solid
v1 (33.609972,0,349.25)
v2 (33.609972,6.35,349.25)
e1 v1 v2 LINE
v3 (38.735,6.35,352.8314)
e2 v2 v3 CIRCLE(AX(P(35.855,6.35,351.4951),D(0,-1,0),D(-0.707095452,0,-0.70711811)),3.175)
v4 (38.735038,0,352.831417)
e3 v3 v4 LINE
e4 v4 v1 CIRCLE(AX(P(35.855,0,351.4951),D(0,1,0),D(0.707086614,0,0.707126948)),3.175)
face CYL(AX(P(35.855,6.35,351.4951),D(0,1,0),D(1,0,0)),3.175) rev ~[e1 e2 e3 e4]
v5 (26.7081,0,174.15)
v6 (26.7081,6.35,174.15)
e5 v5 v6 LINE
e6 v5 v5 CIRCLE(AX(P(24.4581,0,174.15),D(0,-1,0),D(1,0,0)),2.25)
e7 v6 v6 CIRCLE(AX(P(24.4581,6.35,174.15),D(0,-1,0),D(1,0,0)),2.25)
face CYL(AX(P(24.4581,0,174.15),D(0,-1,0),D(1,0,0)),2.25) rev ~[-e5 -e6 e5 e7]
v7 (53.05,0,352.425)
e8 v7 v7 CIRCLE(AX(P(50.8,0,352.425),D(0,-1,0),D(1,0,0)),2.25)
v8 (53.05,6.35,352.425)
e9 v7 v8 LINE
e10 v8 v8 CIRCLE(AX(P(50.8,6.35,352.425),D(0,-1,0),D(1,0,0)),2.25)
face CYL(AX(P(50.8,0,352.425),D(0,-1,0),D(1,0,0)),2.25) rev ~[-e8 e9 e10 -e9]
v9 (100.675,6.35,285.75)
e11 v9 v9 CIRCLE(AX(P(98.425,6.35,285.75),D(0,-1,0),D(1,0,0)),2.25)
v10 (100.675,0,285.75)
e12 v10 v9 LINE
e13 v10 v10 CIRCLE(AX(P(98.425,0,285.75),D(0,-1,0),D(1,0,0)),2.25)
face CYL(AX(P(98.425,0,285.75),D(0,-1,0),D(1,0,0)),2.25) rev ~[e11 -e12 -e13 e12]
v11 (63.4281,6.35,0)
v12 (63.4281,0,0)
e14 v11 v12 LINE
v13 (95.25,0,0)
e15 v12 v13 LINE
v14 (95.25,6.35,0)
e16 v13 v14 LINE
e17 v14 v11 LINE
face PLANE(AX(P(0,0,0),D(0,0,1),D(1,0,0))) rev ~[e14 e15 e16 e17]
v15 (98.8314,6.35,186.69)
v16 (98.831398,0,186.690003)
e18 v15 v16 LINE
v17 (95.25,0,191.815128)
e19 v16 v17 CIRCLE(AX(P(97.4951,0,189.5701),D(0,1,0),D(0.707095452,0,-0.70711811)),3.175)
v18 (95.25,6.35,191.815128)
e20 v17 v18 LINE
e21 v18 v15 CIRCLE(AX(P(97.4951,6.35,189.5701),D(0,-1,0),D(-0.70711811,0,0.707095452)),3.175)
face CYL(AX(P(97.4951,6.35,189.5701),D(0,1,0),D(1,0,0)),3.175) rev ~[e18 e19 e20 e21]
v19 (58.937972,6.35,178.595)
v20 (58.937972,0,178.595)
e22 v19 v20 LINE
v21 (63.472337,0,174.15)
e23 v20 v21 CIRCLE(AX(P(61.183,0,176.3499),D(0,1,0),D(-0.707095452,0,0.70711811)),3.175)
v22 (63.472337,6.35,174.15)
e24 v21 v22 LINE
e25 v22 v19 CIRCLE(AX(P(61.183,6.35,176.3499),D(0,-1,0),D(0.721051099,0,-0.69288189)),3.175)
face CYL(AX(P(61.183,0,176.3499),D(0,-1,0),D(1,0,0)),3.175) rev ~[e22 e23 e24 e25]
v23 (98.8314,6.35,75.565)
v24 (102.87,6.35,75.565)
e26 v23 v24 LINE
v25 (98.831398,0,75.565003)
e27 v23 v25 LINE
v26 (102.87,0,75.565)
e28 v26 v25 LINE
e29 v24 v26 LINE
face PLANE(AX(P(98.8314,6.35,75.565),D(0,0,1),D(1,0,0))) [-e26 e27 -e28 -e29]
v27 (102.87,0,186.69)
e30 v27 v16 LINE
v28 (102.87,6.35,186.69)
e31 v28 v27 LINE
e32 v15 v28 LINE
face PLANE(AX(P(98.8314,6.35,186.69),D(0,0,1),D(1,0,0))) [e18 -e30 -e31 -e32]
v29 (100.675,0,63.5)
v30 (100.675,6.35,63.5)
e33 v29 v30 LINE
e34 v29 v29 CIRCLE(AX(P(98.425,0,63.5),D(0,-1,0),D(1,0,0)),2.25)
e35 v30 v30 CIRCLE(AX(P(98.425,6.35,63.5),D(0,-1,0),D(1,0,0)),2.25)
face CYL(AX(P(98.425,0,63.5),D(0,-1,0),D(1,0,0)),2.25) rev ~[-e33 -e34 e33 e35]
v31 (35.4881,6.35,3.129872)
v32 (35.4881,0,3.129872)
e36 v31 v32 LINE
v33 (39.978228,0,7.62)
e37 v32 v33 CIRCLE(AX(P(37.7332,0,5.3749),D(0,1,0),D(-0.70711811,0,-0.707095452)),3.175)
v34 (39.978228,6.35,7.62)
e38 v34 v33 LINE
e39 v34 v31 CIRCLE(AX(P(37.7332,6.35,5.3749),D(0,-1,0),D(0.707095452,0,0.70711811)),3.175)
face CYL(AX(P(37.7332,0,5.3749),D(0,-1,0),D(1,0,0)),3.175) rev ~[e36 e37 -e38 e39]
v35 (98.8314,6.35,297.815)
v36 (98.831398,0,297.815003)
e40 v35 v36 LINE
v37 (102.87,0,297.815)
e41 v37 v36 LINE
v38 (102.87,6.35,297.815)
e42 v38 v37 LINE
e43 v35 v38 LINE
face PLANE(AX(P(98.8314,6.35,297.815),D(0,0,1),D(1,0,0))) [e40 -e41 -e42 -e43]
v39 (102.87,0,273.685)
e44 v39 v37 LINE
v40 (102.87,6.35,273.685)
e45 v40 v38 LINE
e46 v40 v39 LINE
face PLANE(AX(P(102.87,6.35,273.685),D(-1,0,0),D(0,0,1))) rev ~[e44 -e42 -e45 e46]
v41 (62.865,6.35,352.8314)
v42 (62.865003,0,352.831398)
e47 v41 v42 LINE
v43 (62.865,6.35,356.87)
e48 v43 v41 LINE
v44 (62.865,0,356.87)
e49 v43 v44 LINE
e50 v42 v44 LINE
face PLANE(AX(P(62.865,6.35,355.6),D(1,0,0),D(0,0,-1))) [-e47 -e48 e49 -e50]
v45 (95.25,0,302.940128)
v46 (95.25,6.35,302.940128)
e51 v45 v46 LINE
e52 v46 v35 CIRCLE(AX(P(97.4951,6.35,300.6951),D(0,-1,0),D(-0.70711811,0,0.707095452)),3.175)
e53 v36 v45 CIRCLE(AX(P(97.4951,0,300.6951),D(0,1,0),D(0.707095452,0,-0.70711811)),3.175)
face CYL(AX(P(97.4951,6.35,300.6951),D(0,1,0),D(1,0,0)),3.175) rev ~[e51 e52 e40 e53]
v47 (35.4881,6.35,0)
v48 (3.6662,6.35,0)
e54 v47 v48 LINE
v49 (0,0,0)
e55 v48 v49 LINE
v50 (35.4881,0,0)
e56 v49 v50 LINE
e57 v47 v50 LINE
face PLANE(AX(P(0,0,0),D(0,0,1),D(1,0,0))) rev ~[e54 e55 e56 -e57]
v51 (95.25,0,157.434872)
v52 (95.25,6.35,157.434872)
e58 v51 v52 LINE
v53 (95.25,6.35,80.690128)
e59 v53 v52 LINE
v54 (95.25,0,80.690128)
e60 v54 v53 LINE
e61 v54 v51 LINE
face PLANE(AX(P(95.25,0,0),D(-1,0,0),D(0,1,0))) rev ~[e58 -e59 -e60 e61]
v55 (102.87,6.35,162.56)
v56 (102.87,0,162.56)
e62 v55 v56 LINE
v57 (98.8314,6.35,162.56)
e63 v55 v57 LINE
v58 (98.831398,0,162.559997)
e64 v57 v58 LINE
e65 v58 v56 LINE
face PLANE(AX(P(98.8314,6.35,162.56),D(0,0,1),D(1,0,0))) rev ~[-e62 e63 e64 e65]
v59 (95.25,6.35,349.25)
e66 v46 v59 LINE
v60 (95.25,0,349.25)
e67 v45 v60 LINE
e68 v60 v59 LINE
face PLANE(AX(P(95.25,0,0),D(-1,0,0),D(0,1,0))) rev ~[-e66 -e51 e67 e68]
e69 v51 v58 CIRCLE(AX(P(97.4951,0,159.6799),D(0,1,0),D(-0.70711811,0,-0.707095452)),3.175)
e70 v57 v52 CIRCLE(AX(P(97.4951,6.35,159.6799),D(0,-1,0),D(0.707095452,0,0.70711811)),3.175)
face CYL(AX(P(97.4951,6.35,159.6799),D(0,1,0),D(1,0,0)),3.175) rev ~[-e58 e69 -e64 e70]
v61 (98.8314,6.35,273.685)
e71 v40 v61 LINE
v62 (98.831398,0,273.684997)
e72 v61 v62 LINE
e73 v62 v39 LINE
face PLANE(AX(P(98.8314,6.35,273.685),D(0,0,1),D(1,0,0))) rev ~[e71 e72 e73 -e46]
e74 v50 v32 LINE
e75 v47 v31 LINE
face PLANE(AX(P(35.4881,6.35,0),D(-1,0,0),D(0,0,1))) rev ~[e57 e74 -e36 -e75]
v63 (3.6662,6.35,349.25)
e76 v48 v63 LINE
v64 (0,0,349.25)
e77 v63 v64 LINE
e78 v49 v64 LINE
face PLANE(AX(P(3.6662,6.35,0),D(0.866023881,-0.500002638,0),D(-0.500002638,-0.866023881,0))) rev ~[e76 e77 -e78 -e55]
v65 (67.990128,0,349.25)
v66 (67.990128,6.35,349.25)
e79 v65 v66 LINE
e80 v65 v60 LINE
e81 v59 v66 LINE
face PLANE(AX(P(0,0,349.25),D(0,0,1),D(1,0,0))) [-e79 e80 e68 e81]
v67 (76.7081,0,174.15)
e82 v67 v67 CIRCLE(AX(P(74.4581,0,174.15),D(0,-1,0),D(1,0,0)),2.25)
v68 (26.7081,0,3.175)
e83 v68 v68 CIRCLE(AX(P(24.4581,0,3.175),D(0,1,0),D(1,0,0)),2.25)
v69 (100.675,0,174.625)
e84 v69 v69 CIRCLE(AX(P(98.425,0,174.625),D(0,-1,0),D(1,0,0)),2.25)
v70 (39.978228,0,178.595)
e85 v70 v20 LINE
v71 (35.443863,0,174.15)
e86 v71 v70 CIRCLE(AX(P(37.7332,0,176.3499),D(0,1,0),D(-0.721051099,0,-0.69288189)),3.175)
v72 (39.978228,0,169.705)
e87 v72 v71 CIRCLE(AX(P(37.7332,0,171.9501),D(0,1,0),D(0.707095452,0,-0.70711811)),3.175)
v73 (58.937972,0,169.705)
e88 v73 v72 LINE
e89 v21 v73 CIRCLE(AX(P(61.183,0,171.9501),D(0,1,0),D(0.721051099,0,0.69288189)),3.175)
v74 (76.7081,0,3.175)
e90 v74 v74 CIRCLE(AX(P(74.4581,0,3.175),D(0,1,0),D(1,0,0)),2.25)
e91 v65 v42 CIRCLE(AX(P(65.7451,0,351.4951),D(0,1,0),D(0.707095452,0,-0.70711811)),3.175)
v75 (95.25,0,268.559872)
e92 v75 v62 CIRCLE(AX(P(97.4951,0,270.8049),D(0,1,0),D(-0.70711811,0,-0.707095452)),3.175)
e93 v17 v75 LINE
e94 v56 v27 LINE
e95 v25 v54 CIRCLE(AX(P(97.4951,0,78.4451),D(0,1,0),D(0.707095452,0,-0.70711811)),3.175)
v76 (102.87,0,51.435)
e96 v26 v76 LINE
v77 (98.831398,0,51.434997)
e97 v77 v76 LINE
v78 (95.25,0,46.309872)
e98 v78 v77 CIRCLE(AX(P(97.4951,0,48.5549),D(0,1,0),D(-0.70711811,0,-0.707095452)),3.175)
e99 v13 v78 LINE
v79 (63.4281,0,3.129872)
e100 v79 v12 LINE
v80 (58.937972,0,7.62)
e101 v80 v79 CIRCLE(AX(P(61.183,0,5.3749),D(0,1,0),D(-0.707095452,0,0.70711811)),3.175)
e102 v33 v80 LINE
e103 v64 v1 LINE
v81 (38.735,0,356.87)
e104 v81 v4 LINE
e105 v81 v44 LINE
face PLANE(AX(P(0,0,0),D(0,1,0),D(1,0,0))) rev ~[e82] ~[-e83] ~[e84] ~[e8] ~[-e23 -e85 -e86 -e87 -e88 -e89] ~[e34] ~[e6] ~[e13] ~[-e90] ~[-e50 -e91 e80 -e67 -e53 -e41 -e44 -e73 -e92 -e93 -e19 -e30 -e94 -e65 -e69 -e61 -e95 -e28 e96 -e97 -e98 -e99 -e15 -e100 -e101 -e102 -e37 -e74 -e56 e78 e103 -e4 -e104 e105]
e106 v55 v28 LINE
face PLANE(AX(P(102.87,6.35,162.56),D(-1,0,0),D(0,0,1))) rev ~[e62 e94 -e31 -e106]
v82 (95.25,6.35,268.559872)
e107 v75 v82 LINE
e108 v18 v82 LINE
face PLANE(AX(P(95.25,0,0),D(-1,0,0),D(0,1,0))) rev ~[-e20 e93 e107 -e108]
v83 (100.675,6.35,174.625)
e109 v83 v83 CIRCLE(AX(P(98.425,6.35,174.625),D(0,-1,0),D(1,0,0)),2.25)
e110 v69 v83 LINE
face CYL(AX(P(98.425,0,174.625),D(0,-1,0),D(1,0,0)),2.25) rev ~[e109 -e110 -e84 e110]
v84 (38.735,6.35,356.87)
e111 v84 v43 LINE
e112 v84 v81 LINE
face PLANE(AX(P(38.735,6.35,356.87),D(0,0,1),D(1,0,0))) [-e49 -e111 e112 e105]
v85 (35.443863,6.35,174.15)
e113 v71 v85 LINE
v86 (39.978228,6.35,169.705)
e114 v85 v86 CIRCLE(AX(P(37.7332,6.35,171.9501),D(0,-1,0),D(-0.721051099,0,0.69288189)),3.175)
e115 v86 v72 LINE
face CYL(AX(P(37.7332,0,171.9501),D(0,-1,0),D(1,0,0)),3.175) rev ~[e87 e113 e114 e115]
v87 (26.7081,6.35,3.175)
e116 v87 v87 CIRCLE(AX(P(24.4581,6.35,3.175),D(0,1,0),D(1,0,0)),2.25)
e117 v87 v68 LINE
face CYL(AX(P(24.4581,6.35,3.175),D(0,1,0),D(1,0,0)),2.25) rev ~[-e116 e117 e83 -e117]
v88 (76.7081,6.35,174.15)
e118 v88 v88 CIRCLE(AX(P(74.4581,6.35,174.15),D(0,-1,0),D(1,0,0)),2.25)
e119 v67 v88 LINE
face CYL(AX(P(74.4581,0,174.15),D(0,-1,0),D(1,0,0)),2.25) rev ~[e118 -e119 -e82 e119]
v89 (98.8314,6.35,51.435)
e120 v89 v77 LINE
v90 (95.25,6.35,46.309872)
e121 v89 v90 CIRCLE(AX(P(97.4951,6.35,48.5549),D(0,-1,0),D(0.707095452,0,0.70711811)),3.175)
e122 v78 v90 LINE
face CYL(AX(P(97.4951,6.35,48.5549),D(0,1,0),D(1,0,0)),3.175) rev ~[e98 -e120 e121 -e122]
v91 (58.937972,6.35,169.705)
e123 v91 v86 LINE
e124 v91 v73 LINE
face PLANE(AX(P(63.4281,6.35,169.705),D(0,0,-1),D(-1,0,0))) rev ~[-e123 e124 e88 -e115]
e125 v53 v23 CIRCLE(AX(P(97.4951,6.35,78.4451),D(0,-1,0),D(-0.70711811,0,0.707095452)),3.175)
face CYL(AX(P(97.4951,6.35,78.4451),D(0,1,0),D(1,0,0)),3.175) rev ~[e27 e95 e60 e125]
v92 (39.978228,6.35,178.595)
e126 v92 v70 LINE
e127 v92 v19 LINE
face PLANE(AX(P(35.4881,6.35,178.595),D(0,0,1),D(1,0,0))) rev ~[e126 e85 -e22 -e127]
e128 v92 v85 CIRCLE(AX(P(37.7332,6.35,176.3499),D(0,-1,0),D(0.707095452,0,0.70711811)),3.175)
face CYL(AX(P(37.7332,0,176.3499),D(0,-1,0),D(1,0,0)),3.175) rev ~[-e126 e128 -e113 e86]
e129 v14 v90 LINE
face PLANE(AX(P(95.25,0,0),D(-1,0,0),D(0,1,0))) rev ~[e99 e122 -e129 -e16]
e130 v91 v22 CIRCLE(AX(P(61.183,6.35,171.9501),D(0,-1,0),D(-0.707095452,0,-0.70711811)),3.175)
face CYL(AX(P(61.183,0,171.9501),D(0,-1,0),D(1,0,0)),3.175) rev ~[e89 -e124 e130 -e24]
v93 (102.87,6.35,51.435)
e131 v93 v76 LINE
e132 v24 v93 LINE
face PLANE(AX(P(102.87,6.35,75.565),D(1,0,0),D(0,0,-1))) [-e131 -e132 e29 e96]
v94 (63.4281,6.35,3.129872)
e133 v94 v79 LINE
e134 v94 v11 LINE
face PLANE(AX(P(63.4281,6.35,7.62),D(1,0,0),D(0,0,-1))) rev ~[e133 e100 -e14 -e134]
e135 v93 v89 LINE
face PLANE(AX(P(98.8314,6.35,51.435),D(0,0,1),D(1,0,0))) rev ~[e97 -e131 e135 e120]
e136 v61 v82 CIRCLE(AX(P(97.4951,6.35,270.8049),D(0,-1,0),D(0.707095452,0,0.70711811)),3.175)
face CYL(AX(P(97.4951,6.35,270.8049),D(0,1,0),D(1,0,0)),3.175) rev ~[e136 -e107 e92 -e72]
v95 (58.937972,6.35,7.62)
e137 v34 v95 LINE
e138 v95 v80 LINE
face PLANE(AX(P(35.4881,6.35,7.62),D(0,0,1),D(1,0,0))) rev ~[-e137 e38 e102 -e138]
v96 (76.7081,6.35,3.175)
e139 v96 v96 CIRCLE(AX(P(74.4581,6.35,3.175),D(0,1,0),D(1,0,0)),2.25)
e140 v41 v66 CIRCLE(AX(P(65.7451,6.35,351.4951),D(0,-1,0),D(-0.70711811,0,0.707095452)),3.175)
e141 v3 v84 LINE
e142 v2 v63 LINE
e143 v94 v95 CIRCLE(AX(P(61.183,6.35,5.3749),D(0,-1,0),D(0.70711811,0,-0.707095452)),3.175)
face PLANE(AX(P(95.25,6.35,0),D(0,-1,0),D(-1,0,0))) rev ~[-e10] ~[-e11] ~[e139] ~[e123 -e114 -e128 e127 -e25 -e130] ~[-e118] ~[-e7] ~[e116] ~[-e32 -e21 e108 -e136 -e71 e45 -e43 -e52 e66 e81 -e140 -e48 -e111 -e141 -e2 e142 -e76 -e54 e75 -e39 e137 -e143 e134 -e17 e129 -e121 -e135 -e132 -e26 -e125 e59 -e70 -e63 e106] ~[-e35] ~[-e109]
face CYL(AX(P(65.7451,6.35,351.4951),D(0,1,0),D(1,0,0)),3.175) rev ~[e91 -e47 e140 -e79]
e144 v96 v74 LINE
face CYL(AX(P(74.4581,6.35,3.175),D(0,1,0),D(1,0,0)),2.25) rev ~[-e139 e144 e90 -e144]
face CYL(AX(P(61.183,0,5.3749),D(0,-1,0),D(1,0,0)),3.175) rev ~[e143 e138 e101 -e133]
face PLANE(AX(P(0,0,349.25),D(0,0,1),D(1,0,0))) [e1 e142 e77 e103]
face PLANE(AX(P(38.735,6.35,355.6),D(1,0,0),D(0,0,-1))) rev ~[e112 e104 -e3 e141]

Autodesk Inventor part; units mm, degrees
ref_plane "YZ Plane" through (0, 0, 0) normal (1, 0, 0) x (0, 1, 0)
ref_plane "XZ Plane" through (0, 0, 0) normal (0, 1, 0) x (-1, 0, 0)
ref_plane "XY Plane" through (0, 0, 0) normal (0, 0, 1) x (1, 0, 0)
sketch "Sketch1" plane through (0, 0, 0) normal (0, 0, 1) x (1, 0, 0)
  line L0 (0, 0) -> (95.25, 0)
  line L1 (95.25, 0) -> (95.25, 6.35)
  line L2 (95.25, 6.35) -> (3.6662, 6.35)
  line L3 (3.6662, 6.35) -> (0, 0)
  dimension "d0" = 95.25
  dimension "d1" = 6.35
  dimension "d2" = 60
extrude "Extrusion1" add sketch "Sketch1" along normal blind 349.25
sketch "Sketch2" plane through (0, 0, 0) normal (0, -1, 0) x (1, 0, 0)
  line L0 (38.1, 349.25) -> (63.5, 349.25)
  line L1 (63.5, 349.25) -> (63.5, 355.6)
  line L2 (63.5, 355.6) -> (38.1, 355.6)
  line L3 (38.1, 355.6) -> (38.1, 349.25)
  line L4 (0, 349.25) -> (101.6, 349.25)
  line L5 (0, 349.25) -> (95.25, 349.25) projected
  point P0 (0, 0)
  point P1 (50.8, 349.25)
  dimension "d5" = 25.4
  dimension "d6" = 6.35
  dimension "d9" = 101.6
extrude "Extrusion2" add sketch "Sketch2" against normal blind 6.35
sketch "Sketch3" plane through (0, 0, 0) normal (0, -1, 0) x (1, 0, 0)
  line L0 (63.5, 349.25) -> (63.5, 355.6) projected
  line L1 (63.5, 355.6) -> (38.1, 355.6) projected
  circle A0 centre (50.8, 352.425) radius 2.25
  point P0 (0, 0)
  point P1 (50.8, 355.6)
  point P2 (63.5, 352.425)
  dimension "d10" = 4.5
extrude "Extrusion3" cut sketch "Sketch3" against normal through all
sketch "Sketch4" plane through (0, 0, 0) normal (0, -1, 0) x (1, 0, 0)
  line L0 (95.25, 0) -> (95.25, 349.25) projected
  line L1 (95.25, 50.8) -> (101.6, 50.8)
  line L2 (101.6, 50.8) -> (101.6, 76.2)
  line L3 (101.6, 76.2) -> (95.25, 76.2)
  line L4 (95.25, 76.2) -> (95.25, 50.8)
  line L5 (95.25, 298.45) -> (101.6, 298.45)
  line L6 (101.6, 298.45) -> (101.6, 273.05)
  line L7 (101.6, 273.05) -> (95.25, 273.05)
  line L8 (95.25, 273.05) -> (95.25, 298.45)
  line L9 (95.25, 187.325) -> (101.6, 187.325)
  line L10 (101.6, 187.325) -> (101.6, 161.925)
  line L11 (101.6, 161.925) -> (95.25, 161.925)
  line L12 (95.25, 161.925) -> (95.25, 187.325)
  circle A0 centre (98.425, 285.75) radius 2.25
  circle A1 centre (98.425, 174.625) radius 2.25
  circle A2 centre (98.425, 63.5) radius 2.25
  point P0 (0, 0)
  point P1 (95.25, 174.625)
  point P2 (98.425, 298.45)
  point P3 (98.425, 187.325)
  point P4 (98.425, 76.2)
  point P5 (101.6, 285.75)
  point P6 (101.6, 174.625)
  point P7 (101.6, 63.5)
  dimension "d14" = 25.4
  dimension "d15" = 6.35
  dimension "d16" = 25.4
  dimension "d18" = 25.4
  dimension "d19" = 50.8
  dimension "d20" = 50.8
  dimension "d21" = 4.5
  dimension "d22" = 4.5
  dimension "d23" = 4.5
extrude "Extrusion4" add sketch "Sketch4" against normal blind 6.35
sketch "Sketch6" plane through (95.25, 0, 298.45) normal (0, 0, 1) x (1, 0, 0)
  line L0 (-95.25, 0) -> (-84.2515, 6.35)
  line L1 (0, 6.35) -> (-91.5838, 6.35) projected
  line L2 (-95.25, 0) -> (0, 0) projected
  line L3 (-84.2515, 6.35) -> (-84.2515, 0)
  line L4 (-91.5838, 6.35) -> (-95.25, 0) projected
  line L5 (-84.2515, 6.35) -> (-84.2515, 6.35)
  line L6 (-84.2515, 6.35) -> (-91.5838, 6.35)
  dimension "d28" = 30
  dimension "d31" = 12.7
extrude "Extrusion6" [suppressed]
sketch "Sketch7" plane through (95.25, 0, 187.325) normal (0, 0, 1) x (1, 0, 0)
  line L0 (-77.9015, 12.7) -> (-77.9015, 6.35) projected
  line L1 (-81.5677, 12.7) -> (-77.9015, 12.7) projected
  line L2 (-88.9, 0) -> (-81.5677, 12.7) projected
  line L3 (-77.9015, 6.35) -> (-88.9, 0) projected
  point P0 (-95.25, 0)
extrude "Extrusion7" [suppressed]
sketch "Sketch8" plane through (95.25, 0, 76.2) normal (0, 0, 1) x (1, 0, 0)
  line L0 (-77.9015, 12.7) -> (-77.9015, 6.35) projected
  line L1 (-81.5677, 12.7) -> (-77.9015, 12.7) projected
  line L2 (-88.9, 0) -> (-81.5677, 12.7) projected
  line L3 (-77.9015, 6.35) -> (-88.9, 0) projected
  point P0 (-95.25, 0)
extrude "Extrusion8" [suppressed]
sketch "Sketch10" plane through (3.6662, 6.35, 0) normal (0, 1, 0) x (1, 0, 0)
  circle A0 centre (20.7919, -3.175) radius 2.25
  line L0 (90.648, -6.35) -> (0.9358, -6.35)
  circle A1 centre (70.7919, -3.175) radius 2.25
  line L1 (33.0919, -6.35) -> (58.4919, -6.35)
  line L2 (58.4919, -6.35) -> (58.4919, 0)
  line L3 (58.4919, 0) -> (33.0919, 0)
  line L4 (33.0919, 0) -> (33.0919, -6.35)
  line L5 (20.7919, -3.175) -> (70.7919, -3.175) construction
  line L6 (91.5838, 0) -> (0, 0) projected
  point P0 (-3.6662, 0)
  point P1 (45.7919, -3.175)
  point P2 (45.7919, -6.35)
  point P3 (45.7919, -6.35)
  point P4 (45.7919, 0)
  point P5 (33.0919, -3.175)
  dimension "d39" = 4.5
  dimension "d41" = 4.5
  dimension "d42" = 25.4
  dimension "d43" = 6.35
  dimension "d44" = 50
extrude "Extrusion10" cut sketch "Sketch10" against normal through all
sketch "Sketch11" plane through (38.1, 0, 355.6) normal (0, -1, 0) x (1, 0, 0)
  line L0 (24.0581, -184.625) -> (-1.3419, -184.625)
  line L1 (-1.3419, -184.625) -> (-1.3419, -178.275)
  line L2 (-1.3419, -178.275) -> (24.0581, -178.275)
  line L3 (24.0581, -178.275) -> (24.0581, -184.625)
  line L4 (63.5, -168.275) -> (57.15, -168.275) projected
  line L5 (-1.3419, -349.25) -> (24.0581, -349.25) projected
  point P0 (-38.1, -355.6)
  point P1 (11.3581, -184.625)
  point P2 (11.3581, -349.25)
  dimension "d47" = 25.4
  dimension "d48" = 6.35
  dimension "d85" = 10
extrude "Extrusion11" cut sketch "Sketch11" against normal through all
sketch "Sketch12" plane through (38.1, 0, 355.6) normal (0, -1, 0) x (1, 0, 0)
  circle A0 centre (-13.6419, -181.45) radius 2.25
  circle A1 centre (36.3581, -181.45) radius 2.25
  circle A2 centre (-13.6419, -352.425) radius 2.25 projected
  circle A3 centre (36.3581, -352.425) radius 2.25 projected
  line L0 (24.0581, -178.275) -> (24.0581, -184.625) projected
  point P0 (-38.1, -355.6)
  point P1 (24.0581, -181.45)
  dimension "d52" = 4.5
  dimension "d53" = 4.5
extrude "Extrusion12" cut sketch "Sketch12" against normal through all contours A0 | A1
sketch "Sketch13" plane through (3.6662, 6.35, 349.25) normal (0, 1, 0) x (1, 0, 0)
  line L0 (58.4919, 349.25) -> (91.5838, 349.25) projected
  line L1 (59.7619, 349.25) -> (31.8219, 349.25)
  line L2 (31.8219, 349.25) -> (31.8219, 341.63)
  line L3 (31.8219, 341.63) -> (59.7619, 341.63)
  line L4 (59.7619, 341.63) -> (59.7619, 349.25)
  line L5 (59.7619, 179.545) -> (31.8219, 179.545)
  line L6 (31.8219, 179.545) -> (31.8219, 170.655)
  line L7 (31.8219, 170.655) -> (59.7619, 170.655)
  line L8 (59.7619, 170.655) -> (59.7619, 179.545)
  line L9 (58.4919, 342.9) -> (33.0919, 342.9) projected
  line L10 (33.0919, 178.275) -> (58.4919, 178.275) projected
  line L11 (58.4919, 178.275) -> (58.4919, 171.925) projected
  circle A0 centre (62.0789, -2.2451) radius 3.175
  circle A1 centre (32.1888, -2.2451) radius 3.175
  circle A2 centre (93.8289, 48.5549) radius 3.175
  circle A3 centre (93.8289, 78.4451) radius 3.175
  circle A4 centre (93.8289, 159.6799) radius 3.175
  circle A5 centre (93.8289, 189.5701) radius 3.175
  circle A6 centre (93.8289, 270.8049) radius 3.175
  circle A7 centre (93.8289, 300.6951) radius 3.175
  line L12 (97.9338, 298.45) -> (91.5838, 298.45) projected
  line L13 (91.5838, 298.45) -> (93.8289, 300.6951)
  line L14 (62.0789, -2.2451) -> (59.8338, 0) construction
  line L15 (59.8338, -6.35) -> (59.8338, 0) projected
  point P0 (-3.6662, 349.25)
  point P1 (45.7919, 342.9)
  point P2 (45.7919, 341.63)
  point P3 (45.7919, 178.275)
  point P4 (45.7919, 179.545)
  point P5 (58.4919, 175.1)
  point P6 (59.7619, 175.1)
  point P7 (91.5838, 273.05)
  point P8 (91.5838, 187.325)
  point P9 (91.5838, 161.925)
  point P10 (91.5838, 50.8)
  point P11 (91.5838, 76.2)
  point P12 (34.4338, 0)
  dimension "d61" = 6.35
  dimension "d62" = 6.35
  dimension "d63" = 6.35
  dimension "d64" = 6.35
  dimension "d65" = 6.35
  dimension "d66" = 6.35
  dimension "d67" = 6.35
  dimension "d68" = 6.35
  dimension "d56" = 1.27
  dimension "d57" = 1.27
  dimension "d58" = 1.27
  dimension "d69" = 45
  dimension "d70" = 45
extrude "Extrusion13" cut sketch "Sketch13" against normal through all
sketch "Sketch14" plane through (3.6662, 6.35, 349.25) normal (0, 1, 0) x (1, 0, 0)
  line L0 (97.9338, 50.8) -> (96.074, 50.8) projected
  line L1 (97.9338, 50.8) -> (95.1652, 50.8)
  line L2 (95.1652, 50.8) -> (95.1652, 51.435)
  line L3 (95.1652, 51.435) -> (97.9338, 51.435)
  line L4 (97.9338, 51.435) -> (97.9338, 50.8)
  line L5 (97.9338, 50.8) -> (97.9338, 76.2) projected
  line L6 (97.9338, 76.2) -> (95.1652, 76.2)
  line L7 (95.1652, 76.2) -> (95.1652, 75.565)
  line L8 (95.1652, 75.565) -> (97.9338, 75.565)
  line L9 (97.9338, 75.565) -> (97.9338, 76.2)
  line L10 (97.9338, 161.925) -> (96.074, 161.925) projected
  line L11 (97.9338, 161.925) -> (95.1652, 161.925)
  line L12 (95.1652, 161.925) -> (95.1652, 162.56)
  line L13 (95.1652, 162.56) -> (97.9338, 162.56)
  line L14 (97.9338, 162.56) -> (97.9338, 161.925)
  line L15 (96.074, 187.325) -> (97.9338, 187.325) projected
  line L16 (97.9338, 187.325) -> (95.1652, 187.325)
  line L17 (95.1652, 187.325) -> (95.1652, 186.69)
  line L18 (95.1652, 186.69) -> (97.9338, 186.69)
  line L19 (97.9338, 186.69) -> (97.9338, 187.325)
  line L20 (97.9338, 273.05) -> (97.9338, 298.45) projected
  line L21 (97.9338, 273.05) -> (95.1652, 273.05)
  line L22 (95.1652, 273.05) -> (95.1652, 273.685)
  line L23 (95.1652, 273.685) -> (97.9338, 273.685)
  line L24 (97.9338, 273.685) -> (97.9338, 273.05)
  line L25 (97.9338, 298.45) -> (95.1652, 298.45)
  line L26 (95.1652, 298.45) -> (95.1652, 297.815)
  line L27 (95.1652, 297.815) -> (97.9338, 297.815)
  line L28 (97.9338, 297.815) -> (97.9338, 298.45)
  arc A0 (91.5838, 302.9401) -> (96.074, 298.45) centre (93.8289, 300.6951) ccw projected
  line L29 (34.4338, -6.35) -> (59.8338, -6.35) projected
  arc A1 (64.324, 0) -> (59.8338, -4.4901) centre (62.0789, -2.2451) ccw projected
  line L30 (59.8338, -6.35) -> (59.1988, -6.35)
  line L31 (59.1988, -6.35) -> (59.1988, -3.5814)
  line L32 (59.1988, -3.5814) -> (59.8338, -3.5814)
  line L33 (59.8338, -3.5814) -> (59.8338, -6.35)
  line L34 (34.4338, -4.4901) -> (34.4338, -6.35) projected
  arc A2 (34.4338, -4.4901) -> (29.9437, 0) centre (32.1888, -2.2451) ccw projected
  line L35 (34.4338, -6.35) -> (35.0688, -6.35)
  line L36 (35.0688, -6.35) -> (35.0688, -3.5814)
  line L37 (35.0688, -3.5814) -> (34.4338, -3.5814)
  line L38 (34.4338, -3.5814) -> (34.4338, -6.35)
  point P0 (-3.6662, 349.25)
  dimension "d6" = 6.35
  dimension "d71" = 0.635
  dimension "d72" = 0.635
  dimension "d73" = 0.635
  dimension "d74" = 0.635
  dimension "d75" = 0.635
  dimension "d76" = 0.635
  dimension "d77" = 0.635
extrude "Extrusion14" cut sketch "Sketch14" against normal through all
sketch "Sketch15" plane through (3.6662, 6.35, 349.25) normal (0, 1, 0) x (1, 0, 0)
  line L0 (97.9338, 273.685) -> (95.1652, 273.685) projected
  line L1 (97.9338, 273.685) -> (99.2038, 273.685)
  line L2 (99.2038, 273.685) -> (99.2038, 297.815)
  line L3 (99.2038, 297.815) -> (97.9338, 297.815)
  line L4 (97.9338, 297.815) -> (97.9338, 273.685)
  line L5 (97.9338, 186.69) -> (99.2038, 186.69)
  line L6 (99.2038, 186.69) -> (99.2038, 162.56)
  line L7 (99.2038, 162.56) -> (97.9338, 162.56)
  line L8 (97.9338, 162.56) -> (97.9338, 186.69)
  line L9 (97.9338, 51.435) -> (97.9338, 75.565) projected
  line L10 (97.9338, 75.565) -> (99.2038, 75.565)
  line L11 (99.2038, 75.565) -> (99.2038, 51.435)
  line L12 (99.2038, 51.435) -> (97.9338, 51.435)
  line L13 (97.9338, 51.435) -> (97.9338, 75.565)
  line L14 (35.0688, -6.35) -> (59.1988, -6.35) projected
  line L15 (59.1988, -6.35) -> (35.0688, -6.35)
  line L16 (35.0688, -6.35) -> (35.0688, -7.62)
  line L17 (35.0688, -7.62) -> (59.1988, -7.62)
  line L18 (59.1988, -7.62) -> (59.1988, -6.35)
  point P0 (-3.6662, 349.25)
  dimension "d80" = 1.27
  dimension "d81" = 1.27
extrude "Extrusion15" add sketch "Sketch15" against normal blind 6.35
sketch "Sketch16" plane through (0, 0, 0) normal (0, -1, 0) x (1, 0, 0)
  line L0 (35.4881, 169.705) -> (35.4881, 178.595) construction
  line L1 (35.4881, 178.595) -> (63.4281, 178.595) construction
  line L2 (63.4281, 178.595) -> (63.4281, 169.705) construction
  line L3 (63.4281, 169.705) -> (35.4881, 169.705) construction
  circle A0 centre (24.4581, 174.15) radius 2.25 construction
  circle A1 centre (74.4581, 174.15) radius 2.25 construction
  circle A2 centre (50.8, 352.425) radius 2.25 construction
  circle A3 centre (98.425, 174.625) radius 2.25 construction
  circle A4 centre (98.425, 63.5) radius 2.25 construction
  circle A5 centre (98.425, 285.75) radius 2.25 construction
  circle A6 centre (24.4581, 3.175) radius 2.25 construction
  circle A7 centre (74.4581, 3.175) radius 2.25 construction
  line L4 (62.865, 352.8314) -> (62.865, 356.87) construction
  line L5 (62.865, 356.87) -> (38.735, 356.87) construction
  line L6 (38.735, 356.87) -> (38.735, 352.8314) construction
  arc A8 (33.6099, 349.25) -> (38.735, 352.8314) centre (35.8549, 351.4951) ccw construction
  line L7 (0, 349.25) -> (33.6099, 349.25) construction
  line L8 (0, 0) -> (0, 349.25) construction
  line L9 (0, 0) -> (35.4881, 0) construction
  line L10 (35.4881, 0) -> (35.4881, 7.62) construction
  line L11 (35.4881, 7.62) -> (63.4281, 7.62) construction
  line L12 (63.4281, 7.62) -> (63.4281, 0) construction
  line L13 (63.4281, 0) -> (95.25, 0) construction
  line L14 (95.25, 0) -> (95.25, 46.3099) construction
  arc A9 (98.8314, 51.435) -> (95.25, 46.3099) centre (97.4951, 48.5549) ccw construction
  line L15 (98.8314, 51.435) -> (102.87, 51.435) construction
  line L16 (102.87, 51.435) -> (102.87, 75.565) construction
  line L17 (102.87, 75.565) -> (98.8314, 75.565) construction
  arc A10 (95.25, 80.6901) -> (98.8314, 75.565) centre (97.4951, 78.4451) ccw construction
  line L18 (95.25, 80.6901) -> (95.25, 157.4349) construction
  arc A11 (98.8314, 162.56) -> (95.25, 157.4349) centre (97.4951, 159.6799) ccw construction
  line L19 (98.8314, 162.56) -> (102.87, 162.56) construction
  line L20 (102.87, 162.56) -> (102.87, 186.69) construction
  line L21 (102.87, 186.69) -> (98.8314, 186.69) construction
  arc A12 (95.25, 191.8151) -> (98.8314, 186.69) centre (97.4951, 189.5701) ccw construction
  line L22 (95.25, 191.8151) -> (95.25, 268.5599) construction
  arc A13 (98.8314, 273.685) -> (95.25, 268.5599) centre (97.4951, 270.8049) ccw construction
  line L23 (98.8314, 273.685) -> (102.87, 273.685) construction
  line L24 (102.87, 273.685) -> (102.87, 297.815) construction
  line L25 (102.87, 297.815) -> (98.8314, 297.815) construction
  arc A14 (95.25, 302.9401) -> (98.8314, 297.815) centre (97.4951, 300.6951) ccw construction
  line L26 (95.25, 302.9401) -> (95.25, 349.25) construction
  line L27 (67.9901, 349.25) -> (95.25, 349.25) construction
  arc A15 (62.865, 352.8314) -> (67.9901, 349.25) centre (65.7451, 351.4951) ccw construction
  line L28 (37.7332, 171.9501) -> (37.7332, 176.3499) construction
  line L29 (37.7332, 176.3499) -> (61.183, 176.3499) construction
  line L30 (61.183, 176.3499) -> (61.183, 171.9501) construction
  line L31 (61.183, 171.9501) -> (37.7332, 171.9501) construction
  line L32 (61.183, 5.3749) -> (37.7332, 5.3749) construction
  line L33 (37.7332, 5.3749) -> (37.7332, -2.2451) construction
  line L34 (37.7332, -2.2451) -> (-2.2451, -2.2451) construction
  line L35 (-2.2451, -2.2451) -> (-2.2451, 351.4951) construction
  line L36 (-2.2451, 351.4951) -> (36.4899, 351.4951) construction
  line L37 (36.4899, 351.4951) -> (36.4899, 359.1151) construction
  line L38 (36.4899, 359.1151) -> (65.1101, 359.1151) construction
  line L39 (65.1101, 359.1151) -> (65.1101, 351.4951) construction
  line L40 (65.1101, 351.4951) -> (97.4951, 351.4951) construction
  line L41 (97.4951, 351.4951) -> (97.4951, 300.0601) construction
  line L42 (97.4951, 300.0601) -> (105.1151, 300.0601) construction
  line L43 (105.1151, 300.0601) -> (105.1151, 271.4399) construction
  line L44 (105.1151, 271.4399) -> (97.4951, 271.4399) construction
  line L45 (97.4951, 271.4399) -> (97.4951, 188.9351) construction
  line L46 (97.4951, 188.9351) -> (105.1151, 188.9351) construction
  line L47 (105.1151, 188.9351) -> (105.1151, 160.3149) construction
  line L48 (105.1151, 160.3149) -> (97.4951, 160.3149) construction
  line L49 (97.4951, 160.3149) -> (97.4951, 77.8101) construction
  line L50 (97.4951, 77.8101) -> (105.1151, 77.8101) construction
  line L51 (105.1151, 77.8101) -> (105.1151, 49.1899) construction
  line L52 (105.1151, 49.1899) -> (97.4951, 49.1899) construction
  line L53 (97.4951, 49.1899) -> (97.4951, -2.2451) construction
  line L54 (97.4951, -2.2451) -> (61.183, -2.2451) construction
  line L55 (61.183, -2.2451) -> (61.183, 5.3749) construction
  circle A16 centre (61.183, 176.3499) radius 3.175
  circle A17 centre (61.183, 171.9501) radius 3.175
  circle A18 centre (37.7332, 171.9501) radius 3.175
  circle A19 centre (37.7332, 176.3499) radius 3.175
  line L56 (35.4881, 7.62) -> (63.4281, 7.62) projected
  circle A20 centre (61.183, 5.3749) radius 3.175
  circle A21 centre (37.7332, 5.3749) radius 3.175
  dimension "d86" = 6.35
  dimension "d87" = 6.35
extrude "Extrusion16" cut sketch "Sketch16" against normal through all
equation "\"d1\" = Panel_Thickness"
equation "\"d6\" = Panel_Thickness"
equation "\"d7\" = Panel_Thickness"
equation "\"d15\" = Panel_Thickness"
equation "\"d24\" = Panel_Thickness"
equation "\"d43\" = Panel_Thickness"
equation "\"d48\" = Panel_Thickness"
equation "\"d61\" = d63"
equation "\"d62\" = d61"
equation "\"d63\" = d65"
equation "\"d64\" = d65"
equation "\"d65\" = d68"
equation "\"d66\" = d68"
equation "\"d67\" = d68"
equation "\"d68\" = Tool_Dia"
equation "\"d56\" = Fit_Tolerance"
equation "\"d57\" = Fit_Tolerance"
equation "\"d58\" = Fit_Tolerance"
equation "\"d71\" = 0.5 * Fit_Tolerance"
equation "\"d72\" = 0.5 * Fit_Tolerance"
equation "\"d73\" = 0.5 * Fit_Tolerance"
equation "\"d74\" = 0.5 * Fit_Tolerance"
equation "\"d75\" = 0.5 * Fit_Tolerance"
equation "\"d76\" = 0.5 * Fit_Tolerance"
equation "\"d77\" = 0.5 * Fit_Tolerance"
equation "\"d80\" = Fit_Tolerance"
equation "\"d81\" = Fit_Tolerance"
equation "\"d82\" = Panel_Thickness"
equation "\"d86\" = Tool_Dia"
equation "\"d87\" = Tool_Dia"
equation "\"Panel_Thickness\" = 6.35"
equation "\"Fit_Tolerance\" = 1.27"
equation "\"Tool_Dia\" = 6.35"
properties part number "BA03" material "Polyethylene, High Density"
